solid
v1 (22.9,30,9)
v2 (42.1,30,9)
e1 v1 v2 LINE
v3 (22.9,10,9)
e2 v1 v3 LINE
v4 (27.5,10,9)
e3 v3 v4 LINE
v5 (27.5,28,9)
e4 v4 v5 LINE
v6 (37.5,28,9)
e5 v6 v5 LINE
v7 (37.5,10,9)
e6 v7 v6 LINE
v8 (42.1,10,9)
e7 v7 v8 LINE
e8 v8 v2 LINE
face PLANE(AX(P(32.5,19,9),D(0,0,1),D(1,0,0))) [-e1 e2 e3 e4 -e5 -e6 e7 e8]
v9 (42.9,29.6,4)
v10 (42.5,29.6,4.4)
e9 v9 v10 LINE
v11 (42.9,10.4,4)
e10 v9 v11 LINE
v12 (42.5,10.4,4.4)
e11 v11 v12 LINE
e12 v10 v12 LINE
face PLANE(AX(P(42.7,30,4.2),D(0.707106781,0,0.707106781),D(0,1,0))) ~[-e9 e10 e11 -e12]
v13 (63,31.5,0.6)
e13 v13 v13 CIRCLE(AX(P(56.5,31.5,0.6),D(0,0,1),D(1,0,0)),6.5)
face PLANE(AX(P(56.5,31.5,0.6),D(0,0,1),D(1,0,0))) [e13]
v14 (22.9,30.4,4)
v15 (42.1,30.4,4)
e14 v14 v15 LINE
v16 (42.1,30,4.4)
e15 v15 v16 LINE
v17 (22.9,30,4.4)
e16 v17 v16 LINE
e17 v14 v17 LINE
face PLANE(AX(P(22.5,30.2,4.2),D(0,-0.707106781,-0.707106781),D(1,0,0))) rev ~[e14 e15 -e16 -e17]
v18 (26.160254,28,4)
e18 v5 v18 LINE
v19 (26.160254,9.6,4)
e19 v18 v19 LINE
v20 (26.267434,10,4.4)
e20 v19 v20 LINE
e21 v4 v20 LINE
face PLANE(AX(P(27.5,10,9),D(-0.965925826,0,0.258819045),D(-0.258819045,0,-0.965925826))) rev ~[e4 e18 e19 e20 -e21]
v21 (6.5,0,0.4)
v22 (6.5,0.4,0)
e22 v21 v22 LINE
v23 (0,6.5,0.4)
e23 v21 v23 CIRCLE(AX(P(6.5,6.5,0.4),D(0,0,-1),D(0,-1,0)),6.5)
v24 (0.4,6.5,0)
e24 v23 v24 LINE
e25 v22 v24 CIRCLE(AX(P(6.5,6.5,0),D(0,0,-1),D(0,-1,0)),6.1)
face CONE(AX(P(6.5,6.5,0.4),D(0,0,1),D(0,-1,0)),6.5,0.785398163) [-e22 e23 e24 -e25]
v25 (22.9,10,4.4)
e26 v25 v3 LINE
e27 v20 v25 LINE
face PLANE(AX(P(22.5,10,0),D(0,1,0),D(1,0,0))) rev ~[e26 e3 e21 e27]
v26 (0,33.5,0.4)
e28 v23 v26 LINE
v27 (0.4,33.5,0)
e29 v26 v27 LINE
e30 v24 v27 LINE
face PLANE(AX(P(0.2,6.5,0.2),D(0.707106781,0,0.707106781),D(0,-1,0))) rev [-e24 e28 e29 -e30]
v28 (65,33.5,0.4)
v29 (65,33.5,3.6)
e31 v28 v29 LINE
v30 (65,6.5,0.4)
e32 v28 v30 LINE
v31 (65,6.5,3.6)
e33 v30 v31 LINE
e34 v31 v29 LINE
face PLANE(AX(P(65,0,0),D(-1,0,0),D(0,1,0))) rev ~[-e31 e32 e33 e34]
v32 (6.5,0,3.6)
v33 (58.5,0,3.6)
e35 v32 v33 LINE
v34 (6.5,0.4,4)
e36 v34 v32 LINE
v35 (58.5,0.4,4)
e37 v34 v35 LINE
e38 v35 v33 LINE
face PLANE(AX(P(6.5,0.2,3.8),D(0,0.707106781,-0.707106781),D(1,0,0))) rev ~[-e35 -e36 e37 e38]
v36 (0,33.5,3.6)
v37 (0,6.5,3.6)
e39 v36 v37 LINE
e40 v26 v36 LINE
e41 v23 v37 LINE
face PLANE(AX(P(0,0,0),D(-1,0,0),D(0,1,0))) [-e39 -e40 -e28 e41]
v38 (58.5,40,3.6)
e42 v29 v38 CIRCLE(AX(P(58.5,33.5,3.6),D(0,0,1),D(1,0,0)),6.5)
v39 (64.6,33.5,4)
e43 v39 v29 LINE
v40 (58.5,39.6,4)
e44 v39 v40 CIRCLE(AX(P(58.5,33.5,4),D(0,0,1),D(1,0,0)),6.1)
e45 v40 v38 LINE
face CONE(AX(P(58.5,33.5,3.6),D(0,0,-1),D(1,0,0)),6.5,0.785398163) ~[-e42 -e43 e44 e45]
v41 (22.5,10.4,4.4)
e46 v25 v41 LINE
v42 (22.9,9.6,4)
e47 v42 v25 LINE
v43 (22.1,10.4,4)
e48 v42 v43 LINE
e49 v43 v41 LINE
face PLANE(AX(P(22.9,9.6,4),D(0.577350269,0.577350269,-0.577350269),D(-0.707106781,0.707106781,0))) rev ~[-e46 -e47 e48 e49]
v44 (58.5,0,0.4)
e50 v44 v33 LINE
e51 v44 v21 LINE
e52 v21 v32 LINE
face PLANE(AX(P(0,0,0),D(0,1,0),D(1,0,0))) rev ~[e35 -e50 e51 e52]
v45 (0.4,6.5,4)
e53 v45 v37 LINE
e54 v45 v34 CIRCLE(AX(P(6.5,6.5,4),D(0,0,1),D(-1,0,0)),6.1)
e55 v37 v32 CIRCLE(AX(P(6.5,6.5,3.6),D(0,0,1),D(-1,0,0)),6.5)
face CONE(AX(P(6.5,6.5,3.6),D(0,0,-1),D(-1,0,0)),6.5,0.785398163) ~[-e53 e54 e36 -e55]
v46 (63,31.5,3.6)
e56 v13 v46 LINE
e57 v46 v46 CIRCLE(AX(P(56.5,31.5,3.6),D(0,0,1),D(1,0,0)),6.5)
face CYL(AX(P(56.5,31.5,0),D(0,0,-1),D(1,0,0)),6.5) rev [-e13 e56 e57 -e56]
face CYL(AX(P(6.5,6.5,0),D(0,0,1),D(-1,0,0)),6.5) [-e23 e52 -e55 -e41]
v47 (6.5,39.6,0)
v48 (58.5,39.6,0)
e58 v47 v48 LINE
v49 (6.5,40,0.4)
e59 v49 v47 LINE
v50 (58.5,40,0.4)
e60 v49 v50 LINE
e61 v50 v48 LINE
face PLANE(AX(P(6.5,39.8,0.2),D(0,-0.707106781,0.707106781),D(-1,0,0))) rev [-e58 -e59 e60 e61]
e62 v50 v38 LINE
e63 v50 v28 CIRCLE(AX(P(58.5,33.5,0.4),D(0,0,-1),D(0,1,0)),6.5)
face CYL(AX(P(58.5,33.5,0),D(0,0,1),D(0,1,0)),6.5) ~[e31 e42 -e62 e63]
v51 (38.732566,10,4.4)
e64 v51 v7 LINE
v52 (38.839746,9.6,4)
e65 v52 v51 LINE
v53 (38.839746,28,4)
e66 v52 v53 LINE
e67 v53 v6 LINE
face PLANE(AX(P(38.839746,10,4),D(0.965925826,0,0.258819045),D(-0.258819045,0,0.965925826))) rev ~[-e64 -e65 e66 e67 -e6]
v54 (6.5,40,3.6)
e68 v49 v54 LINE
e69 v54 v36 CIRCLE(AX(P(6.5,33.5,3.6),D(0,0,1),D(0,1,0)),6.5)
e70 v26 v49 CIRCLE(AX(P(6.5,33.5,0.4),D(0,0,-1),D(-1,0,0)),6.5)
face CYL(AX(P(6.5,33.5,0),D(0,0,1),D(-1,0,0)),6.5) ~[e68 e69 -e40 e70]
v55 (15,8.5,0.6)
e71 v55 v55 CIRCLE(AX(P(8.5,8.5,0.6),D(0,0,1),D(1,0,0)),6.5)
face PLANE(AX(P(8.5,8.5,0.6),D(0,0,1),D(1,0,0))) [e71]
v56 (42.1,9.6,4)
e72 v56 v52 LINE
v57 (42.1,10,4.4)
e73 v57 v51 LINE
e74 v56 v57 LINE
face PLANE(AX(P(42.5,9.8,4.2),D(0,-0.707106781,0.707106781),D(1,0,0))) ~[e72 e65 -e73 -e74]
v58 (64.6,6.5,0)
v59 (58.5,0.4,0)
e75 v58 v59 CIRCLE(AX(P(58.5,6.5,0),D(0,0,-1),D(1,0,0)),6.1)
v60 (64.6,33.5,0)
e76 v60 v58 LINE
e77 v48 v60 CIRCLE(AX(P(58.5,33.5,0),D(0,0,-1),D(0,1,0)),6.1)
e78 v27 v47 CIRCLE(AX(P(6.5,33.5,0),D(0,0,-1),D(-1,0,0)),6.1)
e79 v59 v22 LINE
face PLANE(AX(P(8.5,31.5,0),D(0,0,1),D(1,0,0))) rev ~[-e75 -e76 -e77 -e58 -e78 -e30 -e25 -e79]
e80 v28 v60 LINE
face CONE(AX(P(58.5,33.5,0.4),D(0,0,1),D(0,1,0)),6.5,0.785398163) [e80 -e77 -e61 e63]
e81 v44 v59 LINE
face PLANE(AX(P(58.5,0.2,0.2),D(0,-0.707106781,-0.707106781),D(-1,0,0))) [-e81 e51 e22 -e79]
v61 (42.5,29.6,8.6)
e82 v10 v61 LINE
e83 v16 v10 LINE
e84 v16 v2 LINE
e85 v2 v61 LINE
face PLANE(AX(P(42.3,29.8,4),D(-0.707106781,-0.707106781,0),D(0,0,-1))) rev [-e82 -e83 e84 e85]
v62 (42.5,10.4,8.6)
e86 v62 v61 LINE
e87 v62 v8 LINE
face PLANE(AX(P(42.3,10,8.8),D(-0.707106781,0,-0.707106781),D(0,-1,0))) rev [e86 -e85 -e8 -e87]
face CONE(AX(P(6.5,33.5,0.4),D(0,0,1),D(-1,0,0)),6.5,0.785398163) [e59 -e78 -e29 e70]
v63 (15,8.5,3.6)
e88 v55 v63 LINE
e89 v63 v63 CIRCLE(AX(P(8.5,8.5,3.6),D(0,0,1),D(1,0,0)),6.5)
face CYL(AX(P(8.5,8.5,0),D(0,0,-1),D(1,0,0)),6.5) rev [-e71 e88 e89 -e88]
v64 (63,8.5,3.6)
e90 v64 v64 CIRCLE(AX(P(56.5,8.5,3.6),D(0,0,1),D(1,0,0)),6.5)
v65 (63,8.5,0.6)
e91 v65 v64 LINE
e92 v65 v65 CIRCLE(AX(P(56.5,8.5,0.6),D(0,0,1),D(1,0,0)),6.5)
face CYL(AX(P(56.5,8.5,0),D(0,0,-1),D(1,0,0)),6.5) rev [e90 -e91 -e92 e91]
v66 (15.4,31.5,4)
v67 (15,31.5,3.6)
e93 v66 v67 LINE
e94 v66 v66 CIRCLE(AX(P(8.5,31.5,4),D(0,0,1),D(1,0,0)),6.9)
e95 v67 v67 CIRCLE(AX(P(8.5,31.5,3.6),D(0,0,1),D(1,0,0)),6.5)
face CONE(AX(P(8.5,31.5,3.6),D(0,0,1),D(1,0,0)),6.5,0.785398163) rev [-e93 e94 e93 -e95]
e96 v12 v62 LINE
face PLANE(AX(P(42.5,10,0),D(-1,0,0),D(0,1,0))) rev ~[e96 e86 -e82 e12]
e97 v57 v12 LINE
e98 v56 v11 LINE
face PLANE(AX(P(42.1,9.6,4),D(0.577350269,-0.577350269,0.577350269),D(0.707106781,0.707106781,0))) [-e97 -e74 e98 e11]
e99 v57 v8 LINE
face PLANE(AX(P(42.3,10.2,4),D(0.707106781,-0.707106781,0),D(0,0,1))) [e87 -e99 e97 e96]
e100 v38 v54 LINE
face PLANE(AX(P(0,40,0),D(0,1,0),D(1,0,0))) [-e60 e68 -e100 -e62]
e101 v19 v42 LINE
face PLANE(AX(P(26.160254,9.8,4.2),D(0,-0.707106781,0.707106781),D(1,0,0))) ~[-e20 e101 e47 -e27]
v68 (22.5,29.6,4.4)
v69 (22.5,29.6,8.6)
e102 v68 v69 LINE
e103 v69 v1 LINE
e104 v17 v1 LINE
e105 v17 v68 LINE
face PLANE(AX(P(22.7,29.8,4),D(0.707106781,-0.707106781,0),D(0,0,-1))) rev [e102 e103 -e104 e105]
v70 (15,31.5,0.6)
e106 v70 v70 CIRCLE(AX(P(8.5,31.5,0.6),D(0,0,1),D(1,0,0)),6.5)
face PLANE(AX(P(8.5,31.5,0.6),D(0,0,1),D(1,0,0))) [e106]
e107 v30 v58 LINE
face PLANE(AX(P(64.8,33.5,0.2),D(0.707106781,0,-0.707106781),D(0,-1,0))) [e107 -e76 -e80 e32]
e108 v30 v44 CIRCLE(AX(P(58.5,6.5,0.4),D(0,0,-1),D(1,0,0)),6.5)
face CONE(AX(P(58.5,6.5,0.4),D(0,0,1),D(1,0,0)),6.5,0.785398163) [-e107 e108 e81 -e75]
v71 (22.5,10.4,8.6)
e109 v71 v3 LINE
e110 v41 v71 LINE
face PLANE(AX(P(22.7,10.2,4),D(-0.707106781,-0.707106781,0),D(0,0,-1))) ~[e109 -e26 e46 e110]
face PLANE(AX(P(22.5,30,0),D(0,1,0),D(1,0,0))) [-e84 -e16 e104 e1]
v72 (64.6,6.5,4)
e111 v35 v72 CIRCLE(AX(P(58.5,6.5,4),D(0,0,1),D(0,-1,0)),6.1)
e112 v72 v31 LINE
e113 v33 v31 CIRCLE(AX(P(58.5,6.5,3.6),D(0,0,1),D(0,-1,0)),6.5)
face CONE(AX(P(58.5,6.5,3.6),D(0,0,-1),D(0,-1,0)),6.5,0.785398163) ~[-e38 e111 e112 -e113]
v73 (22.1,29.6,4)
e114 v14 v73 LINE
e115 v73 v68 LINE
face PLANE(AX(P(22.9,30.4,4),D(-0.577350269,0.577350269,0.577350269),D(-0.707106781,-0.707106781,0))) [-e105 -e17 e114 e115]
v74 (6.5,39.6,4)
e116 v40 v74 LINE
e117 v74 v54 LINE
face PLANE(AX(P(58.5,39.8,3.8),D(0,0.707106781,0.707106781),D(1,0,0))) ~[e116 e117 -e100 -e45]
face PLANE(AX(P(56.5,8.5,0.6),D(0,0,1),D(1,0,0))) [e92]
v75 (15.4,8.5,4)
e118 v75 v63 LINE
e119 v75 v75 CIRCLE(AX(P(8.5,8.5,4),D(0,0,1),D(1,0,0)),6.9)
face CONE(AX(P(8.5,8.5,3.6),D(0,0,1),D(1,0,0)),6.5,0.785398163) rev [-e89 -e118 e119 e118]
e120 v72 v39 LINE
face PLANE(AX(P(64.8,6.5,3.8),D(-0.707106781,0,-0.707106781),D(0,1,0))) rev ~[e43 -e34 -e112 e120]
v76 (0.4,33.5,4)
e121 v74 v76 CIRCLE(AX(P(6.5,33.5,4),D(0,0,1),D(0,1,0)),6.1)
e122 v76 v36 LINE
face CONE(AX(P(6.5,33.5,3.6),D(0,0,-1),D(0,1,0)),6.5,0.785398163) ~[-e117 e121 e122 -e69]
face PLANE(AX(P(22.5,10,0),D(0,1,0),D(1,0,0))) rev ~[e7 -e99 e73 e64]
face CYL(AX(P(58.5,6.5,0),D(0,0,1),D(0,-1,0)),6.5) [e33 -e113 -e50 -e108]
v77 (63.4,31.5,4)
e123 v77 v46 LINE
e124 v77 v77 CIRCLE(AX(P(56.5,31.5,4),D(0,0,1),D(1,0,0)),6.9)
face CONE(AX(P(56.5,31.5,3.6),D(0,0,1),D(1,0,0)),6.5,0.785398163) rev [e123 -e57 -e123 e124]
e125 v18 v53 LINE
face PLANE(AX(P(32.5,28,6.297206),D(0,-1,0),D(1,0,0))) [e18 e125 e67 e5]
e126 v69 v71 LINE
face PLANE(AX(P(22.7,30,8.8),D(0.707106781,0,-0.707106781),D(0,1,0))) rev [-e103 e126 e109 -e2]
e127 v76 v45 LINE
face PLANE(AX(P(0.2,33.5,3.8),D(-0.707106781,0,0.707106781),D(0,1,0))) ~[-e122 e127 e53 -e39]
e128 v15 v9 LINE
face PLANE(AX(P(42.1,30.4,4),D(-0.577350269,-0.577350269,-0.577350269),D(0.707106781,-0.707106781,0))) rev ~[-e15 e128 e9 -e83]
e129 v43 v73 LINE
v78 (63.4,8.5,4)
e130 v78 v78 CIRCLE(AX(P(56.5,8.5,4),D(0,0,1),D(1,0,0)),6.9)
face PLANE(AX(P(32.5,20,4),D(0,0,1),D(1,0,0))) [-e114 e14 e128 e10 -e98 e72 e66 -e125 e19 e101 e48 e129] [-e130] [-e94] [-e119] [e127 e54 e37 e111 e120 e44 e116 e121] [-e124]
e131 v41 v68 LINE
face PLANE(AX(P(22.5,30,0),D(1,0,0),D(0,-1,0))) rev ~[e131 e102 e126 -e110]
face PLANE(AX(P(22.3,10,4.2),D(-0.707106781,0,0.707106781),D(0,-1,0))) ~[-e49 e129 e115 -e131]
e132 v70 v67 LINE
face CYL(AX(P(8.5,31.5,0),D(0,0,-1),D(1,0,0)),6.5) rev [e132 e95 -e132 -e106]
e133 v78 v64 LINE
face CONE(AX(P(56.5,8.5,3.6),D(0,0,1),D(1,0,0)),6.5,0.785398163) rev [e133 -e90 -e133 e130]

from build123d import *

# Parameters (mm, degrees)
F6_W      = 65
F6_H      = 40
F6_R      = 6.5
F7_DEPTH  = 4
F8_DEPTH  = 0.6
F6_W_2    = 20
F6_H_2    = 18
F6_H_3    = 2
F9_DEPTH  = 9
F11_DEPTH = 18
F12_R     = 6.5
F13_SIZE  = 0.4


with BuildPart() as f7:
    # F6 (on Top) → F7 (new body)
    with BuildSketch(Plane.XY):
        with Locations((32.5, 20)):
            Rectangle(F6_W, F6_H)
        with Locations((8.5, 8.5)):
            Circle(F6_R, mode=Mode.SUBTRACT)
        with Locations((56.5, 8.5)):
            Circle(F6_R, mode=Mode.SUBTRACT)
        with Locations((8.5, 31.5)):
            Circle(F6_R, mode=Mode.SUBTRACT)
        Polygon((22.5, 30), (42.5, 30), (42.5, 28), (42.5, 10), (22.5, 10), (22.5, 28), align=None, mode=Mode.SUBTRACT)
        with Locations((56.5, 31.5)):
            Circle(F6_R, mode=Mode.SUBTRACT)
    extrude(amount=F7_DEPTH)

    # F6 (on Top) → F8 (join)
    with BuildSketch(Plane.XY):
        with Locations((8.5, 31.5)):
            Circle(F6_R)
        with Locations((8.5, 8.5)):
            Circle(F6_R)
        with Locations((56.5, 8.5)):
            Circle(F6_R)
        with Locations((56.5, 31.5)):
            Circle(F6_R)
    extrude(amount=F8_DEPTH)

    # F6 (on Top) → F9 (join)
    with BuildSketch(Plane.XY):
        with Locations((32.5, 19)):
            Rectangle(F6_W_2, F6_H_2)
        with Locations((32.5, 29)):
            Rectangle(F6_W_2, F6_H_3)
    extrude(amount=F9_DEPTH)

    # F10 (on face) → F11 (cut)
    with BuildSketch(Plane.XZ.offset(-10)):
        Polygon((26.1602540378, 4), (38.8397459622, 4), (37.5, 9), (27.5, 9), align=None)
    extrude(amount=-F11_DEPTH, mode=Mode.SUBTRACT)

    # F12
    f12_edges = [f7.edges().sort_by_distance(p)[0] for p in [
        (0, 0, 2),
        (0, 40, 2),
        (65, 0, 2),
        (65, 40, 2),
    ]]
    fillet(f12_edges, radius=F12_R)

    # F13
    f13_edges = [f7.edges().sort_by_distance(p)[0] for p in [
        (0, 20, 0),
        (1.903806, 38.096194, 0),
        (1.903806, 1.903806, 0),
        (32.5, 40, 0),
        (32.5, 0, 0),
        (63.096194, 38.096194, 0),
        (63.096194, 1.903806, 0),
        (65, 20, 0),
        (22.5, 20, 4),
        (22.5, 10, 6.5),
        (22.5, 20, 9),
        (22.5, 30, 6.5),
        (42.5, 20, 4),
        (42.5, 30, 6.5),
        (42.5, 20, 9),
        (42.5, 10, 6.5),
        (50, 8.5, 4),
        (50, 31.5, 4),
        (2, 8.5, 4),
        (2, 31.5, 4),
        (32.5, 0, 4),
        (0, 20, 4),
        (1.903806, 38.096194, 4),
        (1.903806, 1.903806, 4),
        (32.5, 40, 4),
        (63.096194, 38.096194, 4),
        (63.096194, 1.903806, 4),
        (65, 20, 4),
        (32.5, 30, 4),
        (40.669873, 10, 4),
        (24.330127, 10, 4),
    ]]
    chamfer(f13_edges, length=F13_SIZE)


solid = f7.part
